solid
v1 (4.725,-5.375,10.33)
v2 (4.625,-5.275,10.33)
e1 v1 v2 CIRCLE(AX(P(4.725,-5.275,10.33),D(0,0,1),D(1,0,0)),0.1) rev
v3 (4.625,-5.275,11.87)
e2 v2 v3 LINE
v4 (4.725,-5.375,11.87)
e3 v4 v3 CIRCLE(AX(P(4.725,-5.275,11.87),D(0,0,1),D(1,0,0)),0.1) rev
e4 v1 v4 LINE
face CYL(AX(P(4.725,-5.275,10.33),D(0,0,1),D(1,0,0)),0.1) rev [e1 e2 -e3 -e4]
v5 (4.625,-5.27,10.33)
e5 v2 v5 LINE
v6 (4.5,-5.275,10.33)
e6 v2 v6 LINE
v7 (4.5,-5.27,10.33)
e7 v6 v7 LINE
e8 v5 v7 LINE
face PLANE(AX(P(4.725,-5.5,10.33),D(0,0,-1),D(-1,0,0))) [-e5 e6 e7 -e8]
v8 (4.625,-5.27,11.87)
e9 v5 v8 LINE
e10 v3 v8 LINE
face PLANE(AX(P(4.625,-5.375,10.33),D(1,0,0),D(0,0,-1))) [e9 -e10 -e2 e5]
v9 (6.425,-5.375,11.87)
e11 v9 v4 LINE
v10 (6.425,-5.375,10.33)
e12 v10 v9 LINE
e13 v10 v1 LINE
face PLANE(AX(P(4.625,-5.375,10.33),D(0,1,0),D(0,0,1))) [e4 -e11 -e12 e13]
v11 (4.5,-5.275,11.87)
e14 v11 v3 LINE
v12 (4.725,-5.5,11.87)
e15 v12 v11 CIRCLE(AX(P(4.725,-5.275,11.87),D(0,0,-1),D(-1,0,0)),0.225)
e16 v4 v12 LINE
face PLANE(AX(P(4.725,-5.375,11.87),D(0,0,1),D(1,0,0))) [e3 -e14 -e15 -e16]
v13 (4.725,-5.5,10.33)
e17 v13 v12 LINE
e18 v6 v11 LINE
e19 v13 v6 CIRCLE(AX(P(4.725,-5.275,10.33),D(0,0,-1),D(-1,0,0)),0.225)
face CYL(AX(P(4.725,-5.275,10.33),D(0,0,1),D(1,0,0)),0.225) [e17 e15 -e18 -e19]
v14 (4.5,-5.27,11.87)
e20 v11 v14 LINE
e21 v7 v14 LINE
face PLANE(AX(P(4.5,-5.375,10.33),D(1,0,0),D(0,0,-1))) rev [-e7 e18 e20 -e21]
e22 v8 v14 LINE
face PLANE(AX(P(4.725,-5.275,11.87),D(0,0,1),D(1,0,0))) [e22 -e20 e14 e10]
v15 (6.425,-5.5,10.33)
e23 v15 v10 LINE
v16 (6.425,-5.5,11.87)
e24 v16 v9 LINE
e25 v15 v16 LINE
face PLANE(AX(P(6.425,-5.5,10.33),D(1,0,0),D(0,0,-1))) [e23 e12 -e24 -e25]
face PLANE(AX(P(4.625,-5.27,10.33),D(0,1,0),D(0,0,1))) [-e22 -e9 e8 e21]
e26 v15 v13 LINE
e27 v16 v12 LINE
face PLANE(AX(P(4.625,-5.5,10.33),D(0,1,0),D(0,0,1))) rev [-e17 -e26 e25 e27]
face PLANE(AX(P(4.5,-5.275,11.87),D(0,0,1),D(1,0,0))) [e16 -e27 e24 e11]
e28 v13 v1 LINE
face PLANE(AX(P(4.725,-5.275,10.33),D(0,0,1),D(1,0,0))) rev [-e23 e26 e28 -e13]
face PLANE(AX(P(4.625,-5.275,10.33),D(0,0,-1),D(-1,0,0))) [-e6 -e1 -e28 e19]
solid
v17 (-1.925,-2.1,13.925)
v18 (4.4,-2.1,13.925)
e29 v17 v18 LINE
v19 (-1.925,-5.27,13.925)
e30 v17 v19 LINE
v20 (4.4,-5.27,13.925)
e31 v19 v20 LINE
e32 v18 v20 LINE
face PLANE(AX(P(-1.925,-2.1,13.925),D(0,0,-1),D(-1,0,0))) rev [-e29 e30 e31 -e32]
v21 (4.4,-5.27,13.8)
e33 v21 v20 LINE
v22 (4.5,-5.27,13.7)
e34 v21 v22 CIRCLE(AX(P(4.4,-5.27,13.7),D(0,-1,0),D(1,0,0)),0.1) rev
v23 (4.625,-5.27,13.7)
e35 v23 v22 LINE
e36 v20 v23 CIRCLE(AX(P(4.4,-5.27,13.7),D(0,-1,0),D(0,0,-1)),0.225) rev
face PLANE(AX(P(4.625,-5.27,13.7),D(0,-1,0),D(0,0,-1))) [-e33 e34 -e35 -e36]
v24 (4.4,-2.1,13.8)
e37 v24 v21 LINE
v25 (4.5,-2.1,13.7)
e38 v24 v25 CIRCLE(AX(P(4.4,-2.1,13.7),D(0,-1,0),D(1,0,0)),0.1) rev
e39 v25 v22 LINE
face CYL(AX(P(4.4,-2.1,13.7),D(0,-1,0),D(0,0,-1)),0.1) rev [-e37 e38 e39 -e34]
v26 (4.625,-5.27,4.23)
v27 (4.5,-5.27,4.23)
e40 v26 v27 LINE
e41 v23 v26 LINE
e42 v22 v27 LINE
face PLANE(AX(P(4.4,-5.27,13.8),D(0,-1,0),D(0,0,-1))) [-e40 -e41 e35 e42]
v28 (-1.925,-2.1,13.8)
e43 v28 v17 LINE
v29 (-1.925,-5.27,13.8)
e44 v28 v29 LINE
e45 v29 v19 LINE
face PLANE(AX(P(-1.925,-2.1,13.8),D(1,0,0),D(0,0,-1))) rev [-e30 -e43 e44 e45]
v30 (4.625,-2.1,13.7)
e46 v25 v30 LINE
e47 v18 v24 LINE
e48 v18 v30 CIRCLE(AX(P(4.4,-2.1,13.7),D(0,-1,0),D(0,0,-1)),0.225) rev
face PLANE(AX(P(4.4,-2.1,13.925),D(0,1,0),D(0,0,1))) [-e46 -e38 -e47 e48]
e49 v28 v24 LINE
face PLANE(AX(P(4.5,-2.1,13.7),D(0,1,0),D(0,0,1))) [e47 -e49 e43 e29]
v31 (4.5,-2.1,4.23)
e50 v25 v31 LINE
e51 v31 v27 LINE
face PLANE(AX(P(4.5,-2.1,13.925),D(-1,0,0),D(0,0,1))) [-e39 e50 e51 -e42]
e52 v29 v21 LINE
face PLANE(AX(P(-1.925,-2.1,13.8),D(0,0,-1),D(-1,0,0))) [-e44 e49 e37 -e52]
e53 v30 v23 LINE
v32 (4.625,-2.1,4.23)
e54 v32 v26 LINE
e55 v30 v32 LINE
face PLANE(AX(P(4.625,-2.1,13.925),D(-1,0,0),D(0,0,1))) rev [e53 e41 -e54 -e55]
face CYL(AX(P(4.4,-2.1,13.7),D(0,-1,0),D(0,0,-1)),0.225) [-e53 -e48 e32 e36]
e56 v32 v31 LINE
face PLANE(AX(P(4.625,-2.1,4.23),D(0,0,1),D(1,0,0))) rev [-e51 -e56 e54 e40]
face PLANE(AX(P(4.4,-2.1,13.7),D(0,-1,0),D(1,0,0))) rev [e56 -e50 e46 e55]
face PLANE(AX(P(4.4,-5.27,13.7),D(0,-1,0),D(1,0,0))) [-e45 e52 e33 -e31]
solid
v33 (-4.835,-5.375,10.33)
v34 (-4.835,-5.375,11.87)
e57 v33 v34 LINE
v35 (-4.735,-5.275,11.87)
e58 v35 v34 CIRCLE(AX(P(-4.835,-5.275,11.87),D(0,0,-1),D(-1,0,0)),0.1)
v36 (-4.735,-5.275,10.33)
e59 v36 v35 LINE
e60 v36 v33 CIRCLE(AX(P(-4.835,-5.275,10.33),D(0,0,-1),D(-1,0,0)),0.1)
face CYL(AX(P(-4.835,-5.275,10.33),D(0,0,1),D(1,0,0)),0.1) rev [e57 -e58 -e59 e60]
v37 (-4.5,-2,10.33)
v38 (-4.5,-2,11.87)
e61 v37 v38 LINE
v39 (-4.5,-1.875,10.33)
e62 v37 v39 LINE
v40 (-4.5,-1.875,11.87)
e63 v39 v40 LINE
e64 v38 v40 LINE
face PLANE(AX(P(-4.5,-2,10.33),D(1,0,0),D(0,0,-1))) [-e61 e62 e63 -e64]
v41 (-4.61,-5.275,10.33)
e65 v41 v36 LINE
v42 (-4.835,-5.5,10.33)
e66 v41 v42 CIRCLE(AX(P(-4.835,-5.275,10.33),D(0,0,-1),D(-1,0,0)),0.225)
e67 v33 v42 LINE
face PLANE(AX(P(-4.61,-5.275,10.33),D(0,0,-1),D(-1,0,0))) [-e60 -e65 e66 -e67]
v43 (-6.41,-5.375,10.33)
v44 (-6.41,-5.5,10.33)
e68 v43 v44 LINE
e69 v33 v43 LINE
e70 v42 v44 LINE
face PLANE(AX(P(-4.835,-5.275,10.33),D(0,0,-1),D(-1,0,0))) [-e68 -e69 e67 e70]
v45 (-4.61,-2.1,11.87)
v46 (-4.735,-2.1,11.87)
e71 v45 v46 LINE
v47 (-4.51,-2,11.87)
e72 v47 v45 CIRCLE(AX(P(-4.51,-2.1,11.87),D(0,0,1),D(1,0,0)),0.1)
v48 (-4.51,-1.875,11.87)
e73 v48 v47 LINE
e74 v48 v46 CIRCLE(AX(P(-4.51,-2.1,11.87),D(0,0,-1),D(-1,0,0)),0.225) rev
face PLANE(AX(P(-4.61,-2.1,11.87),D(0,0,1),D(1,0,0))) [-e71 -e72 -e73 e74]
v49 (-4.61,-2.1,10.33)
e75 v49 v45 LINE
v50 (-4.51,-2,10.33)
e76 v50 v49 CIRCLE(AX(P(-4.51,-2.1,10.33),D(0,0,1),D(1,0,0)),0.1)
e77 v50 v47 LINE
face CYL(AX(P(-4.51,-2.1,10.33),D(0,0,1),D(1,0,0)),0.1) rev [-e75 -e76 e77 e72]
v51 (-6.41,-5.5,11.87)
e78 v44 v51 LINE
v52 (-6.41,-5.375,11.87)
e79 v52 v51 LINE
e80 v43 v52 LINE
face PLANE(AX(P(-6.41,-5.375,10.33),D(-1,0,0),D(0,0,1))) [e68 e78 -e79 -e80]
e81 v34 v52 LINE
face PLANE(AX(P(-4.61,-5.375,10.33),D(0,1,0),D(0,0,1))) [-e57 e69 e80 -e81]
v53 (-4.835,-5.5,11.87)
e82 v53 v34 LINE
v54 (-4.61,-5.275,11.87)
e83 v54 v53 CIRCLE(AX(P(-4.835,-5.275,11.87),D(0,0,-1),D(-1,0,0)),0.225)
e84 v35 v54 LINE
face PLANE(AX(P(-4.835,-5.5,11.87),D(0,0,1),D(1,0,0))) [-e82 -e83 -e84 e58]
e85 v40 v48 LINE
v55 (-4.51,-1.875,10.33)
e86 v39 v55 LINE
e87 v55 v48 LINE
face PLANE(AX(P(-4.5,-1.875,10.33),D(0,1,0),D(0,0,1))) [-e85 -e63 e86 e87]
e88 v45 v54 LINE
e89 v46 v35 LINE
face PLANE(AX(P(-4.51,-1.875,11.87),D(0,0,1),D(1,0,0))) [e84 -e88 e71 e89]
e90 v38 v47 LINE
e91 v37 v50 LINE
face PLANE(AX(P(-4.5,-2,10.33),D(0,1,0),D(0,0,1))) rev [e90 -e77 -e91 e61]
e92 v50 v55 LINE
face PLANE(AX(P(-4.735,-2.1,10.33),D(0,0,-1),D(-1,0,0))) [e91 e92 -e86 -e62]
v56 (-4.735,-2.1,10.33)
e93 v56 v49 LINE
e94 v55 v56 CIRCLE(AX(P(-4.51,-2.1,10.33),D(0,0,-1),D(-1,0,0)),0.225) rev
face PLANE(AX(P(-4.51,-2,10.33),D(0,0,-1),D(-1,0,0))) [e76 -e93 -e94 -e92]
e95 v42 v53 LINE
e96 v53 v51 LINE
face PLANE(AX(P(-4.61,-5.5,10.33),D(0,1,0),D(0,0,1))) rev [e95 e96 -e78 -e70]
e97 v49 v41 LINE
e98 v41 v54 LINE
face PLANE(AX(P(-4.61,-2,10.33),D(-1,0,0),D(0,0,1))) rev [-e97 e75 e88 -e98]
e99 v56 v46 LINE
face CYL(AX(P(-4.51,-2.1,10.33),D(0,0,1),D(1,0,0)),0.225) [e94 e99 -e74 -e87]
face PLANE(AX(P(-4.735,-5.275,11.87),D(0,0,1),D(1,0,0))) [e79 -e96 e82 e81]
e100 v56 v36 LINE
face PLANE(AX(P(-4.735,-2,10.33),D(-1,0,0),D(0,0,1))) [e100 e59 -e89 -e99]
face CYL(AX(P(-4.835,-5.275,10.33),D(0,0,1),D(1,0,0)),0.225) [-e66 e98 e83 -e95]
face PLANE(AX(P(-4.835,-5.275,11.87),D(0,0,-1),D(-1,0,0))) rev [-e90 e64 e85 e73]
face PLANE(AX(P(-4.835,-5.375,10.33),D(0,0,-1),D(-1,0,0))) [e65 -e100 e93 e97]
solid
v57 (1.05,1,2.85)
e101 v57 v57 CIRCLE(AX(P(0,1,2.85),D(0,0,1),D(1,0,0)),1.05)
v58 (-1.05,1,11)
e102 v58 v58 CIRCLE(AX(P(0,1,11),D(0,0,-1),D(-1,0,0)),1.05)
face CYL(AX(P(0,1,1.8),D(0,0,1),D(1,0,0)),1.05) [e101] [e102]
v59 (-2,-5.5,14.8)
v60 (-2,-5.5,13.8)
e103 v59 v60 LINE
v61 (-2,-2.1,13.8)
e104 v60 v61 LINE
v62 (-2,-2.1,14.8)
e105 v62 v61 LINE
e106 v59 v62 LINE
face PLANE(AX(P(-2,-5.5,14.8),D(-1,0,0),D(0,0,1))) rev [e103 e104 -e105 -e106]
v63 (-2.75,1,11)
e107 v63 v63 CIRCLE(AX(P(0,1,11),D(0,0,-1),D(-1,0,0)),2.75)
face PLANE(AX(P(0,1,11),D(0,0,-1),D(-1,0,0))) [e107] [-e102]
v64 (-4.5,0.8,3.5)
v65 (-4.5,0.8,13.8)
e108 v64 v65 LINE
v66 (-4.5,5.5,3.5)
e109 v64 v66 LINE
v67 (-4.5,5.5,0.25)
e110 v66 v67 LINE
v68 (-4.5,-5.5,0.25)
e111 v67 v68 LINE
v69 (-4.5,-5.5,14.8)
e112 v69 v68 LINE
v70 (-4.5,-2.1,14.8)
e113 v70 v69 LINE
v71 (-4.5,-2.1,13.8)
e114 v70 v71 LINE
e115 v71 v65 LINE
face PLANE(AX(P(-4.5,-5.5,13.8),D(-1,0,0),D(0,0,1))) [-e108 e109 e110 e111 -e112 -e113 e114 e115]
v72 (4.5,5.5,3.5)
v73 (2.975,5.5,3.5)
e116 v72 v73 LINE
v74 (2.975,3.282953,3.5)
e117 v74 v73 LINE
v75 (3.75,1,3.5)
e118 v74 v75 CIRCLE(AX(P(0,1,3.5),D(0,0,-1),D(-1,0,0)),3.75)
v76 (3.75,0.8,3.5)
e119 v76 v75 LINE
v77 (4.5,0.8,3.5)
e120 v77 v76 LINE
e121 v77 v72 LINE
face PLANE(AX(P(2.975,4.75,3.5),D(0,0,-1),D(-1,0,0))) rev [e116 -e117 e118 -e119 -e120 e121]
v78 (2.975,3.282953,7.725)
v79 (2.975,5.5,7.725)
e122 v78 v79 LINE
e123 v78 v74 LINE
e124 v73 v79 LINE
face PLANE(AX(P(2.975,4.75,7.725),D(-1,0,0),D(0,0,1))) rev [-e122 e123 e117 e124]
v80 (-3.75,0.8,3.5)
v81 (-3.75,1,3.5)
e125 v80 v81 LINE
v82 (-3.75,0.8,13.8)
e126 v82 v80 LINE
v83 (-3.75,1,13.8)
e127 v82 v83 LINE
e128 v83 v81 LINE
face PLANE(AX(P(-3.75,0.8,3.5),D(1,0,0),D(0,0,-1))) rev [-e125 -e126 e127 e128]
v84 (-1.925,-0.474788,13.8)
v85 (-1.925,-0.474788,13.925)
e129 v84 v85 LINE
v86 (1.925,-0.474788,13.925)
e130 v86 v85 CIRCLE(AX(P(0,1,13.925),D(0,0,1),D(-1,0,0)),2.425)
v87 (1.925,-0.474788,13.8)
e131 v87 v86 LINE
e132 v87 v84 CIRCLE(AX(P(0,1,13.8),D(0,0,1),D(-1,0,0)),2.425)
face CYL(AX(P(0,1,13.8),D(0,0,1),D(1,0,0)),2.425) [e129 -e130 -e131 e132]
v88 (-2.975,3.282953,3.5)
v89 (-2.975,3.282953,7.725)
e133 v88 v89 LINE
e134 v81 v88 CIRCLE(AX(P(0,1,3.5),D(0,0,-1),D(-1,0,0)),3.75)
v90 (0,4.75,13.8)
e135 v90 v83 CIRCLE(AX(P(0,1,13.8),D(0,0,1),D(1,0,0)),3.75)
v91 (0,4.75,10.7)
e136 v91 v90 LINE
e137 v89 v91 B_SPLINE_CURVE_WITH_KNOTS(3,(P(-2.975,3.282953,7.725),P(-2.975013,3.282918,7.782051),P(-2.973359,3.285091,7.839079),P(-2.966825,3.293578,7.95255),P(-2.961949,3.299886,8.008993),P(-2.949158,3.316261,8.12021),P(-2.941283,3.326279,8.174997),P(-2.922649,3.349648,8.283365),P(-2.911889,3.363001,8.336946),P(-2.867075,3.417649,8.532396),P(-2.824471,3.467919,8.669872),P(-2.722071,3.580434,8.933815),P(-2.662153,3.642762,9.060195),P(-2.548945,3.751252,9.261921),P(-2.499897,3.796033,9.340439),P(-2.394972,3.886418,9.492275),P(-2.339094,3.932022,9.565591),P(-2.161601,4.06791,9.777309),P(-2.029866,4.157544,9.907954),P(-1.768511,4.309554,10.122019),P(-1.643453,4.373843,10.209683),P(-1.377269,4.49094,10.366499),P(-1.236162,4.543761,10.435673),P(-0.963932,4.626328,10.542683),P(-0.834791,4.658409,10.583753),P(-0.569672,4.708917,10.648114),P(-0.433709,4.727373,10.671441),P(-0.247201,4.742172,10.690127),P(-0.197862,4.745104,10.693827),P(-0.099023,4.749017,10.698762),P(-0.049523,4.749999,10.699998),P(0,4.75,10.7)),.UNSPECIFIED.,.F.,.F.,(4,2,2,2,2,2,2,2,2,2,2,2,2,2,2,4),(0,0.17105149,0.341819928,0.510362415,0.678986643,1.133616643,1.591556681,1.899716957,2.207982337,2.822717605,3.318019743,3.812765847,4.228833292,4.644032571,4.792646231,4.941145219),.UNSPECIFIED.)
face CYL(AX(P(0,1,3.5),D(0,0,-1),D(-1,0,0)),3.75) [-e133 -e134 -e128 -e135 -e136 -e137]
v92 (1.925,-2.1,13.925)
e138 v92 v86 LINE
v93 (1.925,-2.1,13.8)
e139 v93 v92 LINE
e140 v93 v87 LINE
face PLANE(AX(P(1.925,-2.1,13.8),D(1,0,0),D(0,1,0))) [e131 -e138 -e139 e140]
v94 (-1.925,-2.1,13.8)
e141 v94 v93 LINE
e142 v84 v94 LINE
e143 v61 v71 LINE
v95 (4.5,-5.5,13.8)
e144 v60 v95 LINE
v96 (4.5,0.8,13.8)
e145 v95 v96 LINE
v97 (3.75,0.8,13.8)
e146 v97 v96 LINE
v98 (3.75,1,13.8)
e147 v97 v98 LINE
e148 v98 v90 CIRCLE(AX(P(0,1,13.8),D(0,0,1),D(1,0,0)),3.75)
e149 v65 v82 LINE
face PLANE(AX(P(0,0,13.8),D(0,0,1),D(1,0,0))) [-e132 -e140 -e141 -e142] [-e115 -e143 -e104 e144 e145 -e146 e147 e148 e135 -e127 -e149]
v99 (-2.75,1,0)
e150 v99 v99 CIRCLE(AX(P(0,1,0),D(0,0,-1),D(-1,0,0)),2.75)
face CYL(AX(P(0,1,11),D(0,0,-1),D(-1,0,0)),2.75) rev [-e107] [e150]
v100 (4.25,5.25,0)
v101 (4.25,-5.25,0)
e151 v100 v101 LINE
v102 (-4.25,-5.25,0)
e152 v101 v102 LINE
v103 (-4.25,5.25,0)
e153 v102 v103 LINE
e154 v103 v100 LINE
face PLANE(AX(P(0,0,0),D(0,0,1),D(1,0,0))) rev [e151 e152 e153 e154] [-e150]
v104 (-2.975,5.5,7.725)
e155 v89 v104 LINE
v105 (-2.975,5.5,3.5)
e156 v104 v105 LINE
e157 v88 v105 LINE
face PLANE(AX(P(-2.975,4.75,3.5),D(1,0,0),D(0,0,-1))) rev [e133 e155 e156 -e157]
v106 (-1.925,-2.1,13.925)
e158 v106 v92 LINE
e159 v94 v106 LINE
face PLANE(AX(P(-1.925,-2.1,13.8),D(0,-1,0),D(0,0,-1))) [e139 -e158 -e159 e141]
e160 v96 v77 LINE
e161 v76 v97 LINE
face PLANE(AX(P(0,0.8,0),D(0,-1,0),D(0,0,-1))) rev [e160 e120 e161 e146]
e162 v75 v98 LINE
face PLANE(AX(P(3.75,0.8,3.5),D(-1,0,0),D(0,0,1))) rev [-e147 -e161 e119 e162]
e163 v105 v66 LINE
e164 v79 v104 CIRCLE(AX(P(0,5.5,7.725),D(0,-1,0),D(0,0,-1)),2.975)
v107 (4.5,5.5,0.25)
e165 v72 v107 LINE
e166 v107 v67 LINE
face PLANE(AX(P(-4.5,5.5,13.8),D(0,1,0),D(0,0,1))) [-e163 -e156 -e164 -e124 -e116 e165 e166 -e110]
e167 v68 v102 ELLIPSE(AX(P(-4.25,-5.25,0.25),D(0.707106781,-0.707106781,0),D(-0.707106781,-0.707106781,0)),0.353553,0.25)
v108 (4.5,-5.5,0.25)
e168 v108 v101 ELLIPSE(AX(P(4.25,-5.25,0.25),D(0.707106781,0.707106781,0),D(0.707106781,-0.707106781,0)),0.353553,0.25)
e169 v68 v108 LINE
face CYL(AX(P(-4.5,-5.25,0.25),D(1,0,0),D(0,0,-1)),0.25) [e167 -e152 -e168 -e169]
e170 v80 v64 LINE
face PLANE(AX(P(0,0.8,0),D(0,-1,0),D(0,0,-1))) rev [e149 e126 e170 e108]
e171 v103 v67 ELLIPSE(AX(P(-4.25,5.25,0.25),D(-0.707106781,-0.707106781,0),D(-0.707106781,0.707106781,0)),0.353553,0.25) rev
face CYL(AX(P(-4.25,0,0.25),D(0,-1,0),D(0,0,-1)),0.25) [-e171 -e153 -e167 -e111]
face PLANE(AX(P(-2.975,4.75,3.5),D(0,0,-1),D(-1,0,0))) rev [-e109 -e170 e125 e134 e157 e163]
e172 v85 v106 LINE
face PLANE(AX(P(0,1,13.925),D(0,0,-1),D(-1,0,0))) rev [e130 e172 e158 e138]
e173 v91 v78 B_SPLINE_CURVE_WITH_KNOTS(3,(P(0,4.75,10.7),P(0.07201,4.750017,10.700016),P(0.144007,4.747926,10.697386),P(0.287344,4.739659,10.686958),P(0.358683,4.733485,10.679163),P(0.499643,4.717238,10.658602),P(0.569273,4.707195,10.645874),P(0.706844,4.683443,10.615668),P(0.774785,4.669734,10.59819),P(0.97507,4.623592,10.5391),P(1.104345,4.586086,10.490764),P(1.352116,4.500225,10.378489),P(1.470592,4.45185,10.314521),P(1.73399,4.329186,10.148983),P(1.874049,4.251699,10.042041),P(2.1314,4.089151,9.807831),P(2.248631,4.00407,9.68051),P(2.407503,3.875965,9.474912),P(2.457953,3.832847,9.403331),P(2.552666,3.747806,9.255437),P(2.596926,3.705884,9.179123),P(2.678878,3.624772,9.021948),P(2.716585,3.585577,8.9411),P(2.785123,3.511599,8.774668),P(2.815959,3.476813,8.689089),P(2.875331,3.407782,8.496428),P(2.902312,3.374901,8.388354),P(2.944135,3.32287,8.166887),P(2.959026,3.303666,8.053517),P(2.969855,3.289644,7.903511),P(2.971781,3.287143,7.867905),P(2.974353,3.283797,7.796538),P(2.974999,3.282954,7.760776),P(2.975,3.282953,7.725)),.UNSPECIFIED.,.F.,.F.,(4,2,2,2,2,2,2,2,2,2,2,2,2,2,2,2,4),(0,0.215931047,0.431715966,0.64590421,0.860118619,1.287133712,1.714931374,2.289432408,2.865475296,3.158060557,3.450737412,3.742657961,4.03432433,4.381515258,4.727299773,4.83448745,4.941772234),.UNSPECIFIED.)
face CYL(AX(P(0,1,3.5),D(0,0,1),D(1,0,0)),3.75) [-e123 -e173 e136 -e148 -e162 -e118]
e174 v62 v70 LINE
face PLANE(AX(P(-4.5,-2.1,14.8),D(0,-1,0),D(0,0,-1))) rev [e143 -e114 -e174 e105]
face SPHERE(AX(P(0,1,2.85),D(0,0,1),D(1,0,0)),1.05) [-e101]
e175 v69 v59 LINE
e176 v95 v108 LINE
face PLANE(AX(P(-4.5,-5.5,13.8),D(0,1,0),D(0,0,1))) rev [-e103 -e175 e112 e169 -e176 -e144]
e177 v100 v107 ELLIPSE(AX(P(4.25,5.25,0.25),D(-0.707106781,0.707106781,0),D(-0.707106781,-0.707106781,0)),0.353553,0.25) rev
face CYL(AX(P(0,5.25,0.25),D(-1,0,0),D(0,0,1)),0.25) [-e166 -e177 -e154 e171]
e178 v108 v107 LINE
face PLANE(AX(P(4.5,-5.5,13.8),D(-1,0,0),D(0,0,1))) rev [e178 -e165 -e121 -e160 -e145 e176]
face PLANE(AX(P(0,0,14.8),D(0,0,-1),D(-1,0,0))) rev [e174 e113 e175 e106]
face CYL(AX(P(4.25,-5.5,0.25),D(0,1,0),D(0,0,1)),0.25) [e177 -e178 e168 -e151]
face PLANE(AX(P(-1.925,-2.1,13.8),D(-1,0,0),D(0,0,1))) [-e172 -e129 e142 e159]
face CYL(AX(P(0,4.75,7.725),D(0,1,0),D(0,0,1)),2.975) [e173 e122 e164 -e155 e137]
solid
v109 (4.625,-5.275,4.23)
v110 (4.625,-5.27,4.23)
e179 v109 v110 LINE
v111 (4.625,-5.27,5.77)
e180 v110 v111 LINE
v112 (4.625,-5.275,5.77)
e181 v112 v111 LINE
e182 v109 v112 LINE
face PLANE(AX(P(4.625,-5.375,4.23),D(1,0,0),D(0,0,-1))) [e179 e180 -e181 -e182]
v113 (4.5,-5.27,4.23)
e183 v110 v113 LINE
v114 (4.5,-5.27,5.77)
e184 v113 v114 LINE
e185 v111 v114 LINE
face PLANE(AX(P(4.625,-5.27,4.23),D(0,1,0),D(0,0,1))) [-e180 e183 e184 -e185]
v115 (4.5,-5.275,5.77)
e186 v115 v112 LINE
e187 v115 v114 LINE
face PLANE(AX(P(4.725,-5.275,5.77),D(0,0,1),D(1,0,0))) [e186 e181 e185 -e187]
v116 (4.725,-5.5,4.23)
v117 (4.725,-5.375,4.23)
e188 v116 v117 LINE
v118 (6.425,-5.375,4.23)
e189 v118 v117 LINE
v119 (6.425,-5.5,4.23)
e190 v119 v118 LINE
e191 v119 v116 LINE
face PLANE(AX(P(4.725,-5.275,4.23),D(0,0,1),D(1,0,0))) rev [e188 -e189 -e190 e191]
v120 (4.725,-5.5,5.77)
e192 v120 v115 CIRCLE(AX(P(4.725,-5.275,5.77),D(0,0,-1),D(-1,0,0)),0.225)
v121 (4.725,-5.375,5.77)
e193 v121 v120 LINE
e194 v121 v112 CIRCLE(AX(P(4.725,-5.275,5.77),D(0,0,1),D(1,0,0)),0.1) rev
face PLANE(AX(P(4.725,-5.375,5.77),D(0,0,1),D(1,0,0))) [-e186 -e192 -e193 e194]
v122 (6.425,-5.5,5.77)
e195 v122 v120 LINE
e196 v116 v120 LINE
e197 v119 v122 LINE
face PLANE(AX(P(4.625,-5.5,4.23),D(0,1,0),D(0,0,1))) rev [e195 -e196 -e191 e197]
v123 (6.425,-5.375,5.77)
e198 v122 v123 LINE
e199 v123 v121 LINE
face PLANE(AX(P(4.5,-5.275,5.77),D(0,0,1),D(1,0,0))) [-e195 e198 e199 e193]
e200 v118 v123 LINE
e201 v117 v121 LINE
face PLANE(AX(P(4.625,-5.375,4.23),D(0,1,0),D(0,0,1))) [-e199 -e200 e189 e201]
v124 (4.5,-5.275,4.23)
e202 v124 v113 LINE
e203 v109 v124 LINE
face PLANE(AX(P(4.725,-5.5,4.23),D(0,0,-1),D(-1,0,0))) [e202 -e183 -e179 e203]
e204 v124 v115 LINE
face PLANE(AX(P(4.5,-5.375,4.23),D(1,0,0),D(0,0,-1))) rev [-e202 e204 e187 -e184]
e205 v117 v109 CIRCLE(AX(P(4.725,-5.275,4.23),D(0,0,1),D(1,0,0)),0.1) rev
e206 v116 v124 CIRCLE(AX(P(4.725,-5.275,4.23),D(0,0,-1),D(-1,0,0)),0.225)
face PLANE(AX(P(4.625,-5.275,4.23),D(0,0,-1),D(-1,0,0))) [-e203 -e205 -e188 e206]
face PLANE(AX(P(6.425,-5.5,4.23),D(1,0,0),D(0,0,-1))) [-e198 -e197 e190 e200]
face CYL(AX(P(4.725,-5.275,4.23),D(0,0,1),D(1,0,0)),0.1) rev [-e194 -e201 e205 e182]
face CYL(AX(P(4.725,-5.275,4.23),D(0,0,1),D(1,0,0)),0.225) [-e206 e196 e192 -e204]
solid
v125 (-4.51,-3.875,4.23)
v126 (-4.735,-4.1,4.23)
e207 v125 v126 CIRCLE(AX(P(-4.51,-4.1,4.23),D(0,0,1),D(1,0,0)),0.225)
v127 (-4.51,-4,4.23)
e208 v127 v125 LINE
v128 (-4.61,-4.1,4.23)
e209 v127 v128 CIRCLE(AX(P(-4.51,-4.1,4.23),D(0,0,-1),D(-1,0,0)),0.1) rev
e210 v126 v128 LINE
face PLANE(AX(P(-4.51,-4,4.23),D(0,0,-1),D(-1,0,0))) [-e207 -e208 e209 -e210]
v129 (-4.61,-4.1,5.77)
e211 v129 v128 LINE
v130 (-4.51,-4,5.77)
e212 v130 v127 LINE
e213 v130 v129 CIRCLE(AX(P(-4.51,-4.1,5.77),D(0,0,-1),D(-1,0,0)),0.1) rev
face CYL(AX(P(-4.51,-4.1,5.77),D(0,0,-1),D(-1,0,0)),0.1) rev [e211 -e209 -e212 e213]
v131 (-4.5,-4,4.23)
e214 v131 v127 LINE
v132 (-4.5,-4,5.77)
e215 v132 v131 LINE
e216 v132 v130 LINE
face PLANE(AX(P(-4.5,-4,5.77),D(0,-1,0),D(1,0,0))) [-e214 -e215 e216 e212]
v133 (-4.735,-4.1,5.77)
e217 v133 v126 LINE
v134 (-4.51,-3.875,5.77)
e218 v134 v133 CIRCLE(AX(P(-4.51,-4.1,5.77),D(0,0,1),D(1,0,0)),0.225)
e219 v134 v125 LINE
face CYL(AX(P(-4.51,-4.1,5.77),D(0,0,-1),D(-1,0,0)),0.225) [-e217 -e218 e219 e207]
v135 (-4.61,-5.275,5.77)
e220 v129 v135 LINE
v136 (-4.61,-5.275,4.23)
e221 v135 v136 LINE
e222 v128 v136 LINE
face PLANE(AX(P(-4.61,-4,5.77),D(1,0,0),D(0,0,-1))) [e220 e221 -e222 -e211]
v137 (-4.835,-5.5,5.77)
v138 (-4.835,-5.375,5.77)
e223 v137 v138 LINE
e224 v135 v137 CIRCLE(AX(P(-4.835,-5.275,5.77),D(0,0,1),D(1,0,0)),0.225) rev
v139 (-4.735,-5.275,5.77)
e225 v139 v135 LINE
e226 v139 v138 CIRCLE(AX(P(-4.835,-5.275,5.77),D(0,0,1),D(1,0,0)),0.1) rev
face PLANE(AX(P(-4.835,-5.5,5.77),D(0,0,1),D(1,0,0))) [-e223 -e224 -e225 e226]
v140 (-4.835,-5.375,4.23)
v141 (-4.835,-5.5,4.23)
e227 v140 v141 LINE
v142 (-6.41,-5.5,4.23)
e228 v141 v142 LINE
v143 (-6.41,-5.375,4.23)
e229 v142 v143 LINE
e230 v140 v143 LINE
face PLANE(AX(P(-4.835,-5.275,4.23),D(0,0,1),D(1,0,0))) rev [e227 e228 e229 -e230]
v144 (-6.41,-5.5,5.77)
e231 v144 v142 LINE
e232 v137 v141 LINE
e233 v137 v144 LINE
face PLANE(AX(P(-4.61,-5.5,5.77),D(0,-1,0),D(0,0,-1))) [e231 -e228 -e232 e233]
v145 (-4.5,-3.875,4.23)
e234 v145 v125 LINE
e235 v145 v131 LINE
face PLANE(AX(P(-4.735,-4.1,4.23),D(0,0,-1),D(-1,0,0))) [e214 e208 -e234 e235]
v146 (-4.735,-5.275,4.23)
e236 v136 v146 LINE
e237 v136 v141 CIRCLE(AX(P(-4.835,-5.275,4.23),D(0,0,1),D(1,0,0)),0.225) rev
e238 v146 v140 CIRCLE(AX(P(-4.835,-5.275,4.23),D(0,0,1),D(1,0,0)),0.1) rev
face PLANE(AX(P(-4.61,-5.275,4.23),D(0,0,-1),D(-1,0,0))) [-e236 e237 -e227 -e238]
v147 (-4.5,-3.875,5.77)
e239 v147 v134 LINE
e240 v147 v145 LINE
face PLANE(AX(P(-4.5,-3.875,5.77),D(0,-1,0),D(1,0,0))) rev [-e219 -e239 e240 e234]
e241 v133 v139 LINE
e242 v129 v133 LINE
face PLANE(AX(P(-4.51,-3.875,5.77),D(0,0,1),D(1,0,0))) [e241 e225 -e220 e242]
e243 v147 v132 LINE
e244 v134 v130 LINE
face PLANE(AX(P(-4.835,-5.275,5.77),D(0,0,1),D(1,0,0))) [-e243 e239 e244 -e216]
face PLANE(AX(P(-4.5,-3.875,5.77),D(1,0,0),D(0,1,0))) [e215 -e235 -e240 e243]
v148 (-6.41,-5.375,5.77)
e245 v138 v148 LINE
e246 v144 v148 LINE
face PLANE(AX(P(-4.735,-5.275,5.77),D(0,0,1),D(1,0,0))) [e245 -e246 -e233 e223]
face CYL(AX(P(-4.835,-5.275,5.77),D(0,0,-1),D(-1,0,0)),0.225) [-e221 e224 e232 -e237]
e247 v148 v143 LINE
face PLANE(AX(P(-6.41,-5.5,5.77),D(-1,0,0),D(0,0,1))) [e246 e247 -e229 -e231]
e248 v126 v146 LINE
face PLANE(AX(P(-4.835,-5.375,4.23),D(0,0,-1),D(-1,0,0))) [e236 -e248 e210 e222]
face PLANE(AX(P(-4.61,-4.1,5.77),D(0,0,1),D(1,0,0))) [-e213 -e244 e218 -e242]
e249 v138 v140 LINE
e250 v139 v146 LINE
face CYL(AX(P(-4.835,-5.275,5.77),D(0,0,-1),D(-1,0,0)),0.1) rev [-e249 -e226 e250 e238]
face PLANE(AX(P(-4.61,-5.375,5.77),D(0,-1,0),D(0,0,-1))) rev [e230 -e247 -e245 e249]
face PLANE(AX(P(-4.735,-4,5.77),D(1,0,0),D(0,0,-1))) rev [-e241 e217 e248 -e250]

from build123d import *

# Parameters (mm, degrees)
SKETCH1_W               = 9
SKETCH1_H               = 11
BOSS_EXTRUDE1_DEPTH     = 13.8
SKETCH2_R               = 2.75
CUT_EXTRUDE1_DEPTH      = 11
CUT_EXTRUDE2_DEPTH      = 0.75
SKETCH4_R               = 1.05
BOSS_EXTRUDE2_DEPTH     = 9.2
FILLET2_R               = 1.05
SKETCH6_W               = 0.75
SKETCH6_H               = 10.3
CUT_EXTRUDE3_DEPTH      = 3.95
FILLET3_R               = 3.75
BASE_FLANGE1_DEPTH      = 3.17
BOSS_EXTRUDE4_DEPTH     = 0.125
FILLET4_R               = 0.25
BASE_FLANGE2_DEPTH      = 0.77
BASE_FLANGE2_DEPTH_BACK = 0.77
LPATTERN1_COUNT         = 2
LPATTERN1_PITCH         = 6.1
SKETCH27_W              = 2.5
SKETCH27_H              = 3.4
BOSS_EXTRUDE5_DEPTH     = 1
BASE_FLANGE3_DEPTH      = 0.77
BASE_FLANGE3_DEPTH_BACK = 0.77
BASE_FLANGE4_DEPTH      = 0.77
BASE_FLANGE4_DEPTH_BACK = 0.77


# Sheet-metal steps are written as plain solids
with BuildPart() as part:
    # Sketch1 → Boss-Extrude1 (new body)
    with BuildSketch(Plane.XY):
        Rectangle(SKETCH1_W, SKETCH1_H)
    extrude(amount=BOSS_EXTRUDE1_DEPTH)

    # Sketch2 → Cut-Extrude1 (cut)
    with BuildSketch(Plane(origin=(0, 0, 0), x_dir=(-1, 0, 0), z_dir=(0, 0, -1))):
        with Locations((0, 1)):
            Circle(SKETCH2_R)
    extrude(amount=-CUT_EXTRUDE1_DEPTH, mode=Mode.SUBTRACT)

    # Sketch3 → Cut-Extrude2 (cut)
    with BuildSketch(Plane(origin=(0, 5.5, 0), x_dir=(1, 0, 0), z_dir=(0, 1, 0))):
        with BuildLine():
            Line((2.975, -7.725), (2.975, -3.5))
            Line((2.975, -3.5), (4.5, -3.5))
            Line((4.5, -3.5), (4.5, -13.8))
            Line((4.5, -13.8), (-4.5, -13.8))
            Line((-4.5, -13.8), (-4.5, -3.5))
            Line((-4.5, -3.5), (-2.975, -3.5))
            Line((-2.975, -3.5), (-2.975, -7.725))
            ThreePointArc((-2.975, -7.725), (0, -10.7), (2.975, -7.725))
        make_face()
    extrude(amount=-CUT_EXTRUDE2_DEPTH, mode=Mode.SUBTRACT)

    # Sketch4 → Boss-Extrude2 (add)
    with BuildSketch(Plane(origin=(0, 0, 11), x_dir=(-1, 0, 0), z_dir=(0, 0, -1))):
        with Locations((0, 1)):
            Circle(SKETCH4_R)
    extrude(amount=BOSS_EXTRUDE2_DEPTH)

    # Fillet2
    fillet2_edges = [part.edges().sort_by_distance(p)[0] for p in [
        (1.05, 1, 1.8),
    ]]
    fillet(fillet2_edges, radius=FILLET2_R)

    # Sketch6 → Cut-Extrude3 (cut)
    with BuildSketch(Plane(origin=(0, 4.75, 0), x_dir=(1, 0, 0), z_dir=(0, 1, 0))):
        with Locations((4.125, -8.65)):
            Rectangle(SKETCH6_W, SKETCH6_H)
        with Locations((-4.125, -8.65)):
            Rectangle(SKETCH6_W, SKETCH6_H)
    extrude(amount=-CUT_EXTRUDE3_DEPTH, mode=Mode.SUBTRACT)

    # Fillet3
    fillet3_edges = [part.edges().sort_by_distance(p)[0] for p in [
        (3.75, 4.75, 8.65),
        (-3.75, 4.75, 8.65),
    ]]
    fillet(fillet3_edges, radius=FILLET3_R - 0.0001)  # a hair under: the kernel refuses the full size

    # Fillet4
    fillet4_edges = [part.edges().sort_by_distance(p)[0] for p in [
        (-4.5, 0, 0),
        (0, 5.5, 0),
        (4.5, 0, 0),
        (0, -5.5, 0),
    ]]
    fillet(fillet4_edges, radius=FILLET4_R)



with BuildPart() as body_2:
    # Sketch9 → Base-Flange1 (new body)
    with BuildSketch(Plane.XZ.offset(5.27)):
        with BuildLine():
            Line((-1.925, 13.925), (4.4, 13.925))
            ThreePointArc((4.4, 13.925), (4.559099026, 13.859099026), (4.625, 13.7))
            Line((4.625, 13.7), (4.625, 4.23))
            Line((4.625, 4.23), (4.5, 4.23))
            Line((4.5, 4.23), (4.5, 13.7))
            ThreePointArc((4.5, 13.7), (4.470710678, 13.770710678), (4.4, 13.8))
            Line((4.4, 13.8), (-1.925, 13.8))
            Line((-1.925, 13.8), (-1.925, 13.925))
        make_face()
    extrude(amount=-BASE_FLANGE1_DEPTH)


with BuildPart() as body_3:
    # Sketch14 → Boss-Extrude4 (new body)
    with BuildSketch(Plane(origin=(-10.664949063, -1.262516382, 13.925), x_dir=(1, 0, 0), z_dir=(0, 0, 1))):
        with BuildLine():
            Line((8.739949063, -0.837483618), (8.739949063, 0.787728261))
            ThreePointArc((8.739949063, 0.787728261), (10.664949063, 4.687516382), (12.589949063, 0.787728261))
            Line((12.589949063, 0.787728261), (12.589949063, -0.837483618))
            Line((12.589949063, -0.837483618), (8.739949063, -0.837483618))
        make_face()
    extrude(amount=-BOSS_EXTRUDE4_DEPTH)


with BuildPart() as body_4:
    # Sketch20 → Base-Flange2 (new, two sides: drawn at the far end of the back side and taken through both)
    with BuildSketch(Plane(origin=(0, 0, 11.1), x_dir=(-1, 0, 0), z_dir=(0, 0, -1)).offset(-BASE_FLANGE2_DEPTH_BACK)):
        with BuildLine():
            Line((-4.625, -5.27), (-4.625, -5.275))
            ThreePointArc((-4.625, -5.275), (-4.654289322, -5.345710678), (-4.725, -5.375))
            Line((-4.725, -5.375), (-6.425, -5.375))
            Line((-6.425, -5.375), (-6.425, -5.5))
            Line((-6.425, -5.5), (-4.725, -5.5))
            ThreePointArc((-4.725, -5.5), (-4.565900974, -5.434099026), (-4.5, -5.275))
            Line((-4.5, -5.275), (-4.5, -5.27))
            Line((-4.5, -5.27), (-4.625, -5.27))
        make_face()
    extrude(amount=BASE_FLANGE2_DEPTH + BASE_FLANGE2_DEPTH_BACK)


with BuildPart() as lpattern1_1:
    # LPattern1: pattern copy
    add(body_4.part.moved(Location(Vector(0, 0, -1) * (1 * LPATTERN1_PITCH))))


with BuildPart() as part_1:
    add(part.part)

    add(body_3.part)  # Boss-Extrude5 merges body 3
    # Sketch27 → Boss-Extrude5 (add)
    with BuildSketch(Plane.XY.offset(13.8)):
        with Locations((-3.25, -3.8)):
            Rectangle(SKETCH27_W, SKETCH27_H)
    extrude(amount=BOSS_EXTRUDE5_DEPTH)


with BuildPart() as body_5:
    # Sketch28 → Base-Flange3 (new, two sides: drawn at the far end of the back side and taken through both)
    with BuildSketch(Plane(origin=(0, 0, 11.1), x_dir=(-1, 0, 0), z_dir=(0, 0, -1)).offset(-BASE_FLANGE3_DEPTH_BACK)):
        with BuildLine():
            Line((4.5, -2), (4.51, -2))
            ThreePointArc((4.51, -2), (4.580710678, -2.029289322), (4.61, -2.1))
            Line((4.61, -2.1), (4.61, -5.275))
            ThreePointArc((4.61, -5.275), (4.675900974, -5.434099026), (4.835, -5.5))
            Line((4.835, -5.5), (6.41, -5.5))
            Line((6.41, -5.5), (6.41, -5.375))
            Line((6.41, -5.375), (4.835, -5.375))
            ThreePointArc((4.835, -5.375), (4.764289322, -5.345710678), (4.735, -5.275))
            Line((4.735, -5.275), (4.735, -2.1))
            ThreePointArc((4.735, -2.1), (4.669099026, -1.940900974), (4.51, -1.875))
            Line((4.51, -1.875), (4.5, -1.875))
            Line((4.5, -1.875), (4.5, -2))
        make_face()
    extrude(amount=BASE_FLANGE3_DEPTH + BASE_FLANGE3_DEPTH_BACK)


with BuildPart() as body_6:
    # Sketch31 → Base-Flange4 (new, two sides: drawn at the far end of the back side and taken through both)
    with BuildSketch(Plane.XY.offset(5).offset(-BASE_FLANGE4_DEPTH_BACK)):
        with BuildLine():
            Line((-4.5, -4), (-4.51, -4))
            ThreePointArc((-4.51, -4), (-4.580710678, -4.029289322), (-4.61, -4.1))
            Line((-4.61, -4.1), (-4.61, -5.275))
            ThreePointArc((-4.61, -5.275), (-4.675900974, -5.434099026), (-4.835, -5.5))
            Line((-4.835, -5.5), (-6.41, -5.5))
            Line((-6.41, -5.5), (-6.41, -5.375))
            Line((-6.41, -5.375), (-4.835, -5.375))
            ThreePointArc((-4.835, -5.375), (-4.764289322, -5.345710678), (-4.735, -5.275))
            Line((-4.735, -5.275), (-4.735, -4.1))
            ThreePointArc((-4.735, -4.1), (-4.669099026, -3.940900974), (-4.51, -3.875))
            Line((-4.51, -3.875), (-4.5, -3.875))
            Line((-4.5, -3.875), (-4.5, -4))
        make_face()
    extrude(amount=BASE_FLANGE4_DEPTH + BASE_FLANGE4_DEPTH_BACK)


solid = Compound([body_2.part, body_4.part, lpattern1_1.part, part_1.part, body_5.part, body_6.part])
